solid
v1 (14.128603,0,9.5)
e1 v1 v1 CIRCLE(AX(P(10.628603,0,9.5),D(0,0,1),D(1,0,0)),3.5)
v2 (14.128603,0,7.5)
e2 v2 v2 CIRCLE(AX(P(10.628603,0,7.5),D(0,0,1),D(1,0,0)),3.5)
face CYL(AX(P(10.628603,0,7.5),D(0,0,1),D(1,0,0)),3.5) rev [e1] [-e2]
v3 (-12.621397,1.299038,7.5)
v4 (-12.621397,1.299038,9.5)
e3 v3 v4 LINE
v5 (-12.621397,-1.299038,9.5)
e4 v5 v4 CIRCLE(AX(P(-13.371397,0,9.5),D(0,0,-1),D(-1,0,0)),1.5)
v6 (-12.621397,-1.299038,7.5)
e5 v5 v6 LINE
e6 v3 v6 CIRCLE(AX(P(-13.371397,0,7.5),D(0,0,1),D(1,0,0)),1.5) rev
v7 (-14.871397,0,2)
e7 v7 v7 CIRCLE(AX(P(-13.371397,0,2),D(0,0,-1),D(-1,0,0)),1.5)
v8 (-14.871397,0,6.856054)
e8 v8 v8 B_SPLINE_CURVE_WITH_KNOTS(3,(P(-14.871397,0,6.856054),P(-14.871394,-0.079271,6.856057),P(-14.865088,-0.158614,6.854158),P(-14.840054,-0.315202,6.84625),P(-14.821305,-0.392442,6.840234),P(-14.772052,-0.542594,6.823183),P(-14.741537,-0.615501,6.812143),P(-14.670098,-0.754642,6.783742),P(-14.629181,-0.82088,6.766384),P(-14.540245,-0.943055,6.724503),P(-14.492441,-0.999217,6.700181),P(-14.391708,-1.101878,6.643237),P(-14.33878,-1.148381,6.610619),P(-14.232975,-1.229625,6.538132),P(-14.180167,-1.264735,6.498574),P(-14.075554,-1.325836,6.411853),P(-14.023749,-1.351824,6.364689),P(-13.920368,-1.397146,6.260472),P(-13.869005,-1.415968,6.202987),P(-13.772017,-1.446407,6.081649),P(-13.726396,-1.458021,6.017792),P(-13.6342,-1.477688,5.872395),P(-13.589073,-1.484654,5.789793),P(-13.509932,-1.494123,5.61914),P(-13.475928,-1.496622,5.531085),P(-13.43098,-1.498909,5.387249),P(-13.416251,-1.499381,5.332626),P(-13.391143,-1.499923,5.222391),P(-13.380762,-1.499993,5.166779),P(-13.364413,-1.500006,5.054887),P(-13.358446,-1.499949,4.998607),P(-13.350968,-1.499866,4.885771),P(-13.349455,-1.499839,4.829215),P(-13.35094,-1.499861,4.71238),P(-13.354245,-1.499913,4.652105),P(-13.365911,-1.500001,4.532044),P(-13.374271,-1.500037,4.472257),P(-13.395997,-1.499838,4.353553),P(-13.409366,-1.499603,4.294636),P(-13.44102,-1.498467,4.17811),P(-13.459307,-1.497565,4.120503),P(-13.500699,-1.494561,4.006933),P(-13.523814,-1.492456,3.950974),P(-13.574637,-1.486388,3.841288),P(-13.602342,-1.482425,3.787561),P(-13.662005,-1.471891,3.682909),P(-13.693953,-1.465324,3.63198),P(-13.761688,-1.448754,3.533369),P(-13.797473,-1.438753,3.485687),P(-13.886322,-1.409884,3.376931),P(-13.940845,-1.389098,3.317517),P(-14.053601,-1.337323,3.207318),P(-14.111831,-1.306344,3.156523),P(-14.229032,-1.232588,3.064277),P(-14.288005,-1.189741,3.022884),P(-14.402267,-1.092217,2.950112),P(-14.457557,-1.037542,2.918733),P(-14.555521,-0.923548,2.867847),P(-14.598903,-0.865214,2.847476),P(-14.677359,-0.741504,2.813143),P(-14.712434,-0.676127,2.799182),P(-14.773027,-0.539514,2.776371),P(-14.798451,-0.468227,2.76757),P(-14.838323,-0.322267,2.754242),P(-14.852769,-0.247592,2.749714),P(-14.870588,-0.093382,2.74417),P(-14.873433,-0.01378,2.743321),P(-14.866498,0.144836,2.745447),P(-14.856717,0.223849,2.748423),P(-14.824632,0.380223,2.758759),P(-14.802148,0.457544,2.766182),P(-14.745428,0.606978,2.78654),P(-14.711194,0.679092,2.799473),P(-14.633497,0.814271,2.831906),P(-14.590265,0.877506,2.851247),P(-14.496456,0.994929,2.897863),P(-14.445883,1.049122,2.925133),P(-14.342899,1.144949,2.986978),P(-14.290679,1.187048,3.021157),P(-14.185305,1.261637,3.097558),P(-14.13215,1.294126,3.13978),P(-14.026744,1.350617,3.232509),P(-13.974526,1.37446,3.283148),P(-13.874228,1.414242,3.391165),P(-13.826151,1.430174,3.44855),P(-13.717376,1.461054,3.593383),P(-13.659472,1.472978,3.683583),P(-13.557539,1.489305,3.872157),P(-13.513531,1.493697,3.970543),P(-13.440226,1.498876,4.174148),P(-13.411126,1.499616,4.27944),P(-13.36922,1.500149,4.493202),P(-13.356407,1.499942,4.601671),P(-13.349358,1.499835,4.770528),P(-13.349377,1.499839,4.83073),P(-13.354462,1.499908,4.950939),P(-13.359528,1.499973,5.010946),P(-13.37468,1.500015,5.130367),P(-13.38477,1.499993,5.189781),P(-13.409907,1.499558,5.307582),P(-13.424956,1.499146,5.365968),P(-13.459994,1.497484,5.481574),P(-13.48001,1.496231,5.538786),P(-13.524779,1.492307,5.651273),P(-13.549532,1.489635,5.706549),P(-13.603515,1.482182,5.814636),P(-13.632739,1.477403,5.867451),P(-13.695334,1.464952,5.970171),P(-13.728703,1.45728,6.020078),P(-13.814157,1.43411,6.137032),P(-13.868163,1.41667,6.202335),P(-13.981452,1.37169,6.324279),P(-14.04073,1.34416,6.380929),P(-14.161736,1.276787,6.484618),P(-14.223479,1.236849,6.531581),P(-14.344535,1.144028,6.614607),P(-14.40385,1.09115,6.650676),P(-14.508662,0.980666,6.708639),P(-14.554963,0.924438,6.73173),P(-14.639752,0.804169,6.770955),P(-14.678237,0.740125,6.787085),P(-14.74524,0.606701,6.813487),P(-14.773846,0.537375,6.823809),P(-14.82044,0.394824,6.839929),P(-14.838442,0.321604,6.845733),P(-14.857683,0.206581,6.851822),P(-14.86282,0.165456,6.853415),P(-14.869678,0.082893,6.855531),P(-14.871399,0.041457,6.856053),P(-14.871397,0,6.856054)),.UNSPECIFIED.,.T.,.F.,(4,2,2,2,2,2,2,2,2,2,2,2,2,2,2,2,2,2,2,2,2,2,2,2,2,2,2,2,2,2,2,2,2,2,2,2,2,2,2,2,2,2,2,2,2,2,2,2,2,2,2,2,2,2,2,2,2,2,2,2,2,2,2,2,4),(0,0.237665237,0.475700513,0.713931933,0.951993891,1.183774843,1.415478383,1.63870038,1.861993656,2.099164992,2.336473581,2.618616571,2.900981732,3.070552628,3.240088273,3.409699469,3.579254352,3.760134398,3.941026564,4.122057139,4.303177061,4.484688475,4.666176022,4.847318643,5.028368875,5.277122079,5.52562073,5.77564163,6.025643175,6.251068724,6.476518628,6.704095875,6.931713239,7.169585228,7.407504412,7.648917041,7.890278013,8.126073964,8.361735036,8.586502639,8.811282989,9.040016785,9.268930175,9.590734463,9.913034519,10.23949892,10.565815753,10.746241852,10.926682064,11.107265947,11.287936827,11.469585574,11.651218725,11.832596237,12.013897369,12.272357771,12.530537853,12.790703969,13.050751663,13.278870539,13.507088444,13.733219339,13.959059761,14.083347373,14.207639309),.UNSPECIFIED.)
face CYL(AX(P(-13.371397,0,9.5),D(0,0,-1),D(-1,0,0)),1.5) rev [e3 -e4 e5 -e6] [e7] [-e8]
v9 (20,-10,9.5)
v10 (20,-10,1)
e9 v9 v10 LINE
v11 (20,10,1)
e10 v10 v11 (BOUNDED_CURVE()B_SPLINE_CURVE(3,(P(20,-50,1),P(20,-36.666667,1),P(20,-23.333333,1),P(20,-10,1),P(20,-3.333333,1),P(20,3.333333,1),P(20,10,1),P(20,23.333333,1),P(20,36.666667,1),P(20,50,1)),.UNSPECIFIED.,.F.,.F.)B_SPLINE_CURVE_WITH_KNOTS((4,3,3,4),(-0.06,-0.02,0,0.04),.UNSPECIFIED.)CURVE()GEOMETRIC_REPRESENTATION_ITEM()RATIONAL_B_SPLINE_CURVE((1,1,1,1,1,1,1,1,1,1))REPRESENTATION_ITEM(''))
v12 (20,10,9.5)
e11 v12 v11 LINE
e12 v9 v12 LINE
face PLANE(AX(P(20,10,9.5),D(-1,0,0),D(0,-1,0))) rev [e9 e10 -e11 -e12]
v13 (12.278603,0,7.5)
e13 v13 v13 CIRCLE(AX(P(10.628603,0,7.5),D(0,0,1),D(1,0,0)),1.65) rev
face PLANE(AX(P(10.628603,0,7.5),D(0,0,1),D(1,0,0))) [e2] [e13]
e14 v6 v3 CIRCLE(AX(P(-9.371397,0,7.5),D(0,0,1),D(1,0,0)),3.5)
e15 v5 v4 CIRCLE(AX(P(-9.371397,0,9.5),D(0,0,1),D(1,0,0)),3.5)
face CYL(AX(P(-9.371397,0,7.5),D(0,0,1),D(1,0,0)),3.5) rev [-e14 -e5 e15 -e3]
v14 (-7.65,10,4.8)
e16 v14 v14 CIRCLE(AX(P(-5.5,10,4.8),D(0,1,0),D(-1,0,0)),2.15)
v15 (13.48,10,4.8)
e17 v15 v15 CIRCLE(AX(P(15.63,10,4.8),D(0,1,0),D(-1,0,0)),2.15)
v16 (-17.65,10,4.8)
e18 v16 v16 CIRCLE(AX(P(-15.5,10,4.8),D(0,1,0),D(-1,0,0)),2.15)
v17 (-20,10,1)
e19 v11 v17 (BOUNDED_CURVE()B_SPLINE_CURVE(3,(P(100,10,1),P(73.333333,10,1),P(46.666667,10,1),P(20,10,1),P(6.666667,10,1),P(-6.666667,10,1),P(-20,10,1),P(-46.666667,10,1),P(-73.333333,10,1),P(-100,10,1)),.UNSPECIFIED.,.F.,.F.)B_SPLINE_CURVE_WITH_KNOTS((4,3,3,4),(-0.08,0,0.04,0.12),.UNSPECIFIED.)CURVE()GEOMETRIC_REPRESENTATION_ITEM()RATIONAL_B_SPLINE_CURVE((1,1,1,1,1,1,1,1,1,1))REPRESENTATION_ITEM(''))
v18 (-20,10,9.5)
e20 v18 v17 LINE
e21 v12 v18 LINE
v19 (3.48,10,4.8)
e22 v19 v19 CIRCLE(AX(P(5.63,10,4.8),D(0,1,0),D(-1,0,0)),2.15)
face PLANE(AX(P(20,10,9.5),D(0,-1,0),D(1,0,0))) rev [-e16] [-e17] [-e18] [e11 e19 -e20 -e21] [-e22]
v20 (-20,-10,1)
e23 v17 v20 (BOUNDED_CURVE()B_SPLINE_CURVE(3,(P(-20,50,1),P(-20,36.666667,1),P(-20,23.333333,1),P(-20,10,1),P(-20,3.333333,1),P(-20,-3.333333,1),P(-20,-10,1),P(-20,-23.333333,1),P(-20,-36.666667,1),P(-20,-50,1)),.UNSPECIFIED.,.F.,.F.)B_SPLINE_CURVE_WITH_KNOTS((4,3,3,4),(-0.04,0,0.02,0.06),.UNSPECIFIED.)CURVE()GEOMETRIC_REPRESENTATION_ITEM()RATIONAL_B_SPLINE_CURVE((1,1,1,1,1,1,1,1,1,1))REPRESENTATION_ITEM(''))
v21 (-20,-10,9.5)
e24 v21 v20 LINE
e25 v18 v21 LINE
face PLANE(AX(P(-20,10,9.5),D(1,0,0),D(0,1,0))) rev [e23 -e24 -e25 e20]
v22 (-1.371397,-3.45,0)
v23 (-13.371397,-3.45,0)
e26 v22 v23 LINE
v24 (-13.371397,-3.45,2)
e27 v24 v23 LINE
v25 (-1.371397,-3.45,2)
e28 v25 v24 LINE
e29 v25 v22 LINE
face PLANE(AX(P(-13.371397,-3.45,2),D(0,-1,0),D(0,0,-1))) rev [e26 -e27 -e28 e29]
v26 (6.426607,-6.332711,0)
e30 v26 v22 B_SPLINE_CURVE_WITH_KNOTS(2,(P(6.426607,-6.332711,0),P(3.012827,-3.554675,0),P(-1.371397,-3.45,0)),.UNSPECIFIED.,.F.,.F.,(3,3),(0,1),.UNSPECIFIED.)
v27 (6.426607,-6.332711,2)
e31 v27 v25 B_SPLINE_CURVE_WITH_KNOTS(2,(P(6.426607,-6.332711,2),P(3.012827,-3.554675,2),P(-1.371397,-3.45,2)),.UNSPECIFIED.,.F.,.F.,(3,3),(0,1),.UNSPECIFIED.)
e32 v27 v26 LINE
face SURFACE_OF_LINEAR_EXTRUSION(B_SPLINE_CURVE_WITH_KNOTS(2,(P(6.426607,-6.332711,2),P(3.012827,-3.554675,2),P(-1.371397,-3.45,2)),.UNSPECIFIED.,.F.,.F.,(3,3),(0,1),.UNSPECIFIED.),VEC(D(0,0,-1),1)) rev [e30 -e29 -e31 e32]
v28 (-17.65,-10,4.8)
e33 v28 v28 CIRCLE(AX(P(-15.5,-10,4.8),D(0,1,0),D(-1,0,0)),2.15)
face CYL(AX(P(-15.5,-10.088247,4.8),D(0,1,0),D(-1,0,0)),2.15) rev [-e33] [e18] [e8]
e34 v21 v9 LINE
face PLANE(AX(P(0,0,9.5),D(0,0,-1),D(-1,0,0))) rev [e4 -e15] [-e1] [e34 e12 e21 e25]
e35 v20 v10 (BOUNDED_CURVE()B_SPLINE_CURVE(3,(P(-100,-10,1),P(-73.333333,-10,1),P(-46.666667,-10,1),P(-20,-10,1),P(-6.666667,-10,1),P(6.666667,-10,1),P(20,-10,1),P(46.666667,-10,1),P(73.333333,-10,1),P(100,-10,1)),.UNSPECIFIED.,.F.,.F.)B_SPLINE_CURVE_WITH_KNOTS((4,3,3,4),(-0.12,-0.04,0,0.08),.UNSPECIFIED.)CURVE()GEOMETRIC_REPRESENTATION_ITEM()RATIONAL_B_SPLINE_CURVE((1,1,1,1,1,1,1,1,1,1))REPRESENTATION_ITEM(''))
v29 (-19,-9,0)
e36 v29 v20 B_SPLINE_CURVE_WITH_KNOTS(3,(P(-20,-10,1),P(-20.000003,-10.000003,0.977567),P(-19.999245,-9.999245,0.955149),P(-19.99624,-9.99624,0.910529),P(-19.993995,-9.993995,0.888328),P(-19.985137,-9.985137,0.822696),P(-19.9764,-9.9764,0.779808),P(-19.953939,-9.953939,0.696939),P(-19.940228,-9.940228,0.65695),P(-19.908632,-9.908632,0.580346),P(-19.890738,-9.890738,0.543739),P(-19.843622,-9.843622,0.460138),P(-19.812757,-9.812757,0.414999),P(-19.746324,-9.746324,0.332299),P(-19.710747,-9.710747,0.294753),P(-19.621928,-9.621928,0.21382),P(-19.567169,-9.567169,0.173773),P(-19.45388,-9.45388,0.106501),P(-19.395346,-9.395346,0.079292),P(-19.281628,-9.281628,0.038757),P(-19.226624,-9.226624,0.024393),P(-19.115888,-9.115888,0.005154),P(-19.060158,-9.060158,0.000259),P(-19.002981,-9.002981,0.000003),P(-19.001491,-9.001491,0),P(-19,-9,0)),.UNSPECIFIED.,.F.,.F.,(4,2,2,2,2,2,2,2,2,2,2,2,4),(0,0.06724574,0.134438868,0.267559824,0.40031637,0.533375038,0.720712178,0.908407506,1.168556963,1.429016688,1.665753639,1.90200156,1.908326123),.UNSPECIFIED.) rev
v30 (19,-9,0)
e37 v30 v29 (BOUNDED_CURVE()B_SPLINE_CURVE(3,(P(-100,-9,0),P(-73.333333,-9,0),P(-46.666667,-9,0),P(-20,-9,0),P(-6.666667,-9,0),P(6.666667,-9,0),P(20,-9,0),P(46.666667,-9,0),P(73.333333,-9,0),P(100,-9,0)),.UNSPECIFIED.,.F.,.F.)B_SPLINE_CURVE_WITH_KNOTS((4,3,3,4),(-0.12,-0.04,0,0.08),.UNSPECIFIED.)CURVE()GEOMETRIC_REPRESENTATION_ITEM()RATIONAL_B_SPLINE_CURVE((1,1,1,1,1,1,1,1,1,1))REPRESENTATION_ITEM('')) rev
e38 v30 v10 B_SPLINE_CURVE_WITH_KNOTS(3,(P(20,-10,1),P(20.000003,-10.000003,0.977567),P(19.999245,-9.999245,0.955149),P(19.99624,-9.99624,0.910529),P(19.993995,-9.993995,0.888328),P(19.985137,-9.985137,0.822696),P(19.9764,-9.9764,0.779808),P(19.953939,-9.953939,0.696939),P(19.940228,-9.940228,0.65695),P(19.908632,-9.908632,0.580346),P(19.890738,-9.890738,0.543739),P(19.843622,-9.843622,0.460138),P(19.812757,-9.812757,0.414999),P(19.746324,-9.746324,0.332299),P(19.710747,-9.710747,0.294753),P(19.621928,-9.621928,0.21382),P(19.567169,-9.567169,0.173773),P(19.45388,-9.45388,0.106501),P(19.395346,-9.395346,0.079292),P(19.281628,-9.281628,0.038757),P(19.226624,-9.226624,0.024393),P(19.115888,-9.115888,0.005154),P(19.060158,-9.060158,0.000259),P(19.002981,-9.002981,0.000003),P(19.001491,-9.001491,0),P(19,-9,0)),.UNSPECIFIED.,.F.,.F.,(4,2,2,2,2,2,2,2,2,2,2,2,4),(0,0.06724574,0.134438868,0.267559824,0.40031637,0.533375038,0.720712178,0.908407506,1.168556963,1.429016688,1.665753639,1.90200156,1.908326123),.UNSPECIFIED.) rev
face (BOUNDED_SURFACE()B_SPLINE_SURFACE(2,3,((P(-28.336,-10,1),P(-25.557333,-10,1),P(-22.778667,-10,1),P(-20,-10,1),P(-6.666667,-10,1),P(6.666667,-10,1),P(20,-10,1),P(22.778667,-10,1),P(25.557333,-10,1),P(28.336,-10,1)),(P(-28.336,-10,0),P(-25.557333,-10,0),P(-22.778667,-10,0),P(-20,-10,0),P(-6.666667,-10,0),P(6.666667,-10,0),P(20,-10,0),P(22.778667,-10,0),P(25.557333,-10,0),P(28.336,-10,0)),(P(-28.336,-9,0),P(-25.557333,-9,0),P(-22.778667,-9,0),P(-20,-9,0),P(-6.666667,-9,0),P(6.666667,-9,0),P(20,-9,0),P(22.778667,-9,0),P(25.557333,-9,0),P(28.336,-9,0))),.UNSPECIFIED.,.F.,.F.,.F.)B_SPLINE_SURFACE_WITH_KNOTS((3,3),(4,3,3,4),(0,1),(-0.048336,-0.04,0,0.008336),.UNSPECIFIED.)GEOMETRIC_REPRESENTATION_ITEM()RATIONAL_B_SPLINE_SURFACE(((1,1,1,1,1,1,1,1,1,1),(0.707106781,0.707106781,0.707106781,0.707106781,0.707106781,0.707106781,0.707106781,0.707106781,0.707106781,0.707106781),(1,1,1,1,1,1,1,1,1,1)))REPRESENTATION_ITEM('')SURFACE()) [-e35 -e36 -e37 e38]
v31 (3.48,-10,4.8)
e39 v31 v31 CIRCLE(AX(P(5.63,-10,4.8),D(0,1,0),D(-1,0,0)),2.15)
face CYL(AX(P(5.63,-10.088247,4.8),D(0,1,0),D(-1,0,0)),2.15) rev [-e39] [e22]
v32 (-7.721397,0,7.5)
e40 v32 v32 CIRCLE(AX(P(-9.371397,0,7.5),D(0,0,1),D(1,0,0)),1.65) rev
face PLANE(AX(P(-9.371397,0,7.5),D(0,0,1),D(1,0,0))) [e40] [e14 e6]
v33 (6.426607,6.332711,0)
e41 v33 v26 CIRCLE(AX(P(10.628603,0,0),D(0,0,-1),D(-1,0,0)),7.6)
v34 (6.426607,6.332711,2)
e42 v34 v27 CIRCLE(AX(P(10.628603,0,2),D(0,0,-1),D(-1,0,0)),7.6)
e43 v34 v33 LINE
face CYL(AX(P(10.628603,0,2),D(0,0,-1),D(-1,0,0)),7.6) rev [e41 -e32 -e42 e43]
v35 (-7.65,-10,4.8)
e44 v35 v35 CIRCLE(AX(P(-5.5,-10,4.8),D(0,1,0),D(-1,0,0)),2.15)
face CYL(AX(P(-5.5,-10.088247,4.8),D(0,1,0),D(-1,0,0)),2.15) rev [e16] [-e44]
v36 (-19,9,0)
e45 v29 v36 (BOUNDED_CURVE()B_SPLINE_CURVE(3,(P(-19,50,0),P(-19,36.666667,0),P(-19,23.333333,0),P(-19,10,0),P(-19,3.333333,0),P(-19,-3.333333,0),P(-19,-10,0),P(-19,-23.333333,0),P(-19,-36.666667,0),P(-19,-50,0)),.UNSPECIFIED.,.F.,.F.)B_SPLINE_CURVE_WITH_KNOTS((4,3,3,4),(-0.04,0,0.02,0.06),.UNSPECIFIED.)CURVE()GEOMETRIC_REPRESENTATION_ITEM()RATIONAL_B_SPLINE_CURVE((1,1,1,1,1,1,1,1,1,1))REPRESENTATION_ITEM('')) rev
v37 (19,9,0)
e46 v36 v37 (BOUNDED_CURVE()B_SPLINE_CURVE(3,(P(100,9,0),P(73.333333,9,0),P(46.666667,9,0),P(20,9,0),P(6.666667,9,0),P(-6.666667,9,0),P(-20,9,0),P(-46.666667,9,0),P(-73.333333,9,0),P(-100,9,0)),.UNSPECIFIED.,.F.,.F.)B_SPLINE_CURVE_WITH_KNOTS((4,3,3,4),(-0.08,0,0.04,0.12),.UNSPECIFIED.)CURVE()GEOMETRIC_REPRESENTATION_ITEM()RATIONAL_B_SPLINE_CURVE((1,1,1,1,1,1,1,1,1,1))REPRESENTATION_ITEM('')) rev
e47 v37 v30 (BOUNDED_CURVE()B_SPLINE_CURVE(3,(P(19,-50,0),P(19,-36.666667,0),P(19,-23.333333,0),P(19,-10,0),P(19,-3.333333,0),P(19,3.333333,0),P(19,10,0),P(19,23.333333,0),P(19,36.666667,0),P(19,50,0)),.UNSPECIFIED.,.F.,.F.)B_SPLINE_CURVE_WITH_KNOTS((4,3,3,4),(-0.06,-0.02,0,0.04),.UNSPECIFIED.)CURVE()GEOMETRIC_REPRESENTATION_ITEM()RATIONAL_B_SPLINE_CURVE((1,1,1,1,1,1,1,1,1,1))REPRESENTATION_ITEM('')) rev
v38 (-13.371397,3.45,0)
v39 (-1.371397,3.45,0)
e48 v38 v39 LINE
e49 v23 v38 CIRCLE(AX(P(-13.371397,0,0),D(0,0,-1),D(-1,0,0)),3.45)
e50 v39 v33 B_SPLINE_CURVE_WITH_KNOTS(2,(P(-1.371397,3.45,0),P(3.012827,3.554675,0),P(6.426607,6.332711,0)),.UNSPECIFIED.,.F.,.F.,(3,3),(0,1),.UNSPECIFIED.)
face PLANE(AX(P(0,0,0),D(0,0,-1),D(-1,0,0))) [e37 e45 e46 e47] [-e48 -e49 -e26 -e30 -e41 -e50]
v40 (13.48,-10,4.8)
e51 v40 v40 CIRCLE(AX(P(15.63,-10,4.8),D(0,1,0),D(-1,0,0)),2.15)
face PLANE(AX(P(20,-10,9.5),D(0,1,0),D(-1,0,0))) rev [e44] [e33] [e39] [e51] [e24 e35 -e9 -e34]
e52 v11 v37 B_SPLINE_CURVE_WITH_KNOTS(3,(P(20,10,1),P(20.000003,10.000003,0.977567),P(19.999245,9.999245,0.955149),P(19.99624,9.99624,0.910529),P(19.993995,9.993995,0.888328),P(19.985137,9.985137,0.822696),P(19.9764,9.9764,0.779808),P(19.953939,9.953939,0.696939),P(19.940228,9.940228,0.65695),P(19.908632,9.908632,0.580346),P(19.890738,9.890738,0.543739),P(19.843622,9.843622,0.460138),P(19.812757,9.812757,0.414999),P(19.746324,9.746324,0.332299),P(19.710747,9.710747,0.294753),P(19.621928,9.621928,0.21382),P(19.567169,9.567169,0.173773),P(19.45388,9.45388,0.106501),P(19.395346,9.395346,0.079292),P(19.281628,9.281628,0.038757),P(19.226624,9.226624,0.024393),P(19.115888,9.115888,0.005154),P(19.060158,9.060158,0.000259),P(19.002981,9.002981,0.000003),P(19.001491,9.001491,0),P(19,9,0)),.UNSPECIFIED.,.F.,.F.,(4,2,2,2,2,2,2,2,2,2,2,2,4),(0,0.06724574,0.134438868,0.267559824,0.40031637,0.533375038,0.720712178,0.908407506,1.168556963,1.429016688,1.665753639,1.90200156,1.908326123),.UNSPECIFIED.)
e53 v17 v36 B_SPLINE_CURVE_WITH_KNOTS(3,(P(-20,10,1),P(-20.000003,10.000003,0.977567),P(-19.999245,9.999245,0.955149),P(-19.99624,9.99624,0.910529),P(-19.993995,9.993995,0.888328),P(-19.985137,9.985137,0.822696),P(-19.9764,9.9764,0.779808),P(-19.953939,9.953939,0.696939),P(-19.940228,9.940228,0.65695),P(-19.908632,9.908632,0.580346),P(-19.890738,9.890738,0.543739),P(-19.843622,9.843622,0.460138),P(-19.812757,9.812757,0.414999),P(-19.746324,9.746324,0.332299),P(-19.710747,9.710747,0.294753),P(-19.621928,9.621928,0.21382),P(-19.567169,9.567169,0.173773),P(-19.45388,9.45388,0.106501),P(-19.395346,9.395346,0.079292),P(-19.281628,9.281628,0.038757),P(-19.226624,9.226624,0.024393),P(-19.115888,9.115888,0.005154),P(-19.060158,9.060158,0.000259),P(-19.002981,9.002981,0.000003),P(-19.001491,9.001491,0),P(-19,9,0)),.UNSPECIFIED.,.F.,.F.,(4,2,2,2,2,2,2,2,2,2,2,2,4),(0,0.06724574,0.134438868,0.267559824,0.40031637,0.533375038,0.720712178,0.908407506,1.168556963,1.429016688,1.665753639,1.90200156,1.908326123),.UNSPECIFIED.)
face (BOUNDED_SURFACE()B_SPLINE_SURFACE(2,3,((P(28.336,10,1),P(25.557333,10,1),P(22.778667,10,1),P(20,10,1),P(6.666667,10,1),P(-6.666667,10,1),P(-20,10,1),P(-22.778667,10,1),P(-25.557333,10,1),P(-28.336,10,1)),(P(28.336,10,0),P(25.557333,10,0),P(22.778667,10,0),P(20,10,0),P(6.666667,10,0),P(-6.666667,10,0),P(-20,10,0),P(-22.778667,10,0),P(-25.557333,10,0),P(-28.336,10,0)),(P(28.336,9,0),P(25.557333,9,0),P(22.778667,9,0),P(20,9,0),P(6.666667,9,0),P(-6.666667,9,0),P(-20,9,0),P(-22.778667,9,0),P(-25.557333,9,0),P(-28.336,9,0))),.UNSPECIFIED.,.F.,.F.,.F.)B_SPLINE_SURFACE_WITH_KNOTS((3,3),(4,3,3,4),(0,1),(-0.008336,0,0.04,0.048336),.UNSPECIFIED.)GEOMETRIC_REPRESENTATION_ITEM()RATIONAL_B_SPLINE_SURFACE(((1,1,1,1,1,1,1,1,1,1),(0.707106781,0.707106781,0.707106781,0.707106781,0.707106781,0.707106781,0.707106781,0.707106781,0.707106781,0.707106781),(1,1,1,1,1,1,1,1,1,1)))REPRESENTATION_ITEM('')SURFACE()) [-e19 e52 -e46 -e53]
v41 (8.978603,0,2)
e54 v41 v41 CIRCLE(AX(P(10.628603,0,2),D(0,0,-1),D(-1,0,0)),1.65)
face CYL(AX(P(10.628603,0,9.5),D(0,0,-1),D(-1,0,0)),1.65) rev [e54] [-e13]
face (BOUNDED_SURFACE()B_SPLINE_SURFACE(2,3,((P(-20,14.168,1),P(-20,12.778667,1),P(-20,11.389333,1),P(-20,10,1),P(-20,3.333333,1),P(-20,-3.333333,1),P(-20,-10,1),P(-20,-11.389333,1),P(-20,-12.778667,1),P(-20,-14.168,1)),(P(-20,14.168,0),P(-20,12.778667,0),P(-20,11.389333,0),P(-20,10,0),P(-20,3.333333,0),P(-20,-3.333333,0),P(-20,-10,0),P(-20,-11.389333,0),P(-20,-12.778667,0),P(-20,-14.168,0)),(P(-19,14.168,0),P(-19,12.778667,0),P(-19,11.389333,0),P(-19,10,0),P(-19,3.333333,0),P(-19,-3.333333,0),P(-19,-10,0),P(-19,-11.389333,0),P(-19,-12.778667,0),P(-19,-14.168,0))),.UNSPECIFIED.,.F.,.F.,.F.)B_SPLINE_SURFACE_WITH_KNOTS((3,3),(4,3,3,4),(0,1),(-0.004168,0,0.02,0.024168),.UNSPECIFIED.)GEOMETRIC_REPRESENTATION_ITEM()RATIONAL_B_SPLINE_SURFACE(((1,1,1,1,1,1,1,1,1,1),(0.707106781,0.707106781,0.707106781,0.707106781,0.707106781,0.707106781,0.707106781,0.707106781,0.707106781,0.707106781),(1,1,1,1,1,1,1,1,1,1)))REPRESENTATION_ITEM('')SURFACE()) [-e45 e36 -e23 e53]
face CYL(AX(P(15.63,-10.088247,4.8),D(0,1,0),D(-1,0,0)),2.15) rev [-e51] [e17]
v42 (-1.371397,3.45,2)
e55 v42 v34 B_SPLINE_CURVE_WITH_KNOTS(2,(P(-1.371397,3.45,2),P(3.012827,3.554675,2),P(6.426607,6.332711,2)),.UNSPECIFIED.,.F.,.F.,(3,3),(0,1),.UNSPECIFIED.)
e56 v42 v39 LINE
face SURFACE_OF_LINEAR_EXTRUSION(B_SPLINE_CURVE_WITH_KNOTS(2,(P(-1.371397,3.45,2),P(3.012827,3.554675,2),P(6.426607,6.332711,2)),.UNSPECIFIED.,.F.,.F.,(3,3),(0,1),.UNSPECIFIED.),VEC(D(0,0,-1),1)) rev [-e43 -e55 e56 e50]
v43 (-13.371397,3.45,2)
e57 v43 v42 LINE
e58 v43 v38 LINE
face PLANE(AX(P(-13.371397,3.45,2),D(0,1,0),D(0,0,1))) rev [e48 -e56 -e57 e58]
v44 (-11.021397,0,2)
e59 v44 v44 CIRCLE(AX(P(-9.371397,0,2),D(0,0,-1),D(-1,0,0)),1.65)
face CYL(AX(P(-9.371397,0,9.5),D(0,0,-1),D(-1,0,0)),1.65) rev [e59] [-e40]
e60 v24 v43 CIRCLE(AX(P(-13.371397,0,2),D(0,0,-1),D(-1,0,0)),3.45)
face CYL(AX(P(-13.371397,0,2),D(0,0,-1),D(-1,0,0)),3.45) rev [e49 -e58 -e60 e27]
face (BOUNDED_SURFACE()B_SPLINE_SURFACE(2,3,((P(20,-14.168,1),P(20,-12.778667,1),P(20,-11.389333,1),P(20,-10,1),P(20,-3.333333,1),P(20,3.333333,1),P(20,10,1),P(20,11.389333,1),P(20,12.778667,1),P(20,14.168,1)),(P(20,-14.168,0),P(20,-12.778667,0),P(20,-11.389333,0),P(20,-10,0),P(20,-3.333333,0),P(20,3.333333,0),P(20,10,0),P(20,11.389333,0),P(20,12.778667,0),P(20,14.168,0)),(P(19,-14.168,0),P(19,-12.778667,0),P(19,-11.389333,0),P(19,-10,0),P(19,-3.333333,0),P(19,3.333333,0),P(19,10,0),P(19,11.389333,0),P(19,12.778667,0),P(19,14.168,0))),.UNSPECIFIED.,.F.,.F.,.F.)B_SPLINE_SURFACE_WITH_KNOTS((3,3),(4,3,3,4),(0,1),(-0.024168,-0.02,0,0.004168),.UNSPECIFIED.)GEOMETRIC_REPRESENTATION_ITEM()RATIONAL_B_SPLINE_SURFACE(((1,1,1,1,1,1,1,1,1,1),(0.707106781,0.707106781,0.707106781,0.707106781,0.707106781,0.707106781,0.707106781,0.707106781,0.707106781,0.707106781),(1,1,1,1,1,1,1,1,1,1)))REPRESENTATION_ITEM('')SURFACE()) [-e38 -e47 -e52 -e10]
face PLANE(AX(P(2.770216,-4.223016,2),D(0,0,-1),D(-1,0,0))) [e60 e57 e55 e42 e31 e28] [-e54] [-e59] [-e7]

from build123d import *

# Parameters (mm, degrees)
SKETCH1_W           = 40
SKETCH1_H           = 20
BOSS_EXTRUDE1_DEPTH = 9.5
CUT_EXTRUDE1_DEPTH  = 2
FILLET1_R           = 1
SKETCH4_R           = 2.15
CUT_EXTRUDE2_DEPTH  = 30.837057496
SKETCH5_R           = 1.5
SKETCH5_R_2         = 1.65
CUT_EXTRUDE3_DEPTH  = 25.295061227
SKETCH6_R           = 3.5
CUT_EXTRUDE4_DEPTH  = 2


with BuildPart() as part:
    # Sketch1 → Boss-Extrude1 (new body)
    with BuildSketch(Plane.XY):
        Rectangle(SKETCH1_W, SKETCH1_H)
    extrude(amount=BOSS_EXTRUDE1_DEPTH)

    # Sketch3 → Cut-Extrude1 (cut)
    with BuildSketch(Plane(origin=(0, 0, 0), x_dir=(-1, 0, 0), z_dir=(0, 0, -1))):
        with BuildLine():
            Line((13.371397425, -3.45), (1.371397425, -3.45))
            add(Edge.make_bspline(
                [(-6.426606991, -6.332711355), (-3.012827406, -3.55467535), (1.371397425, -3.45)],
                knots=[0, 0, 0, 1, 1, 1], degree=2))
            ThreePointArc((-6.426606991, -6.332711355), (-18.228602575, 0), (-6.426606991, 6.332711355))
            add(Edge.make_bspline(
                [(-6.426606991, 6.332711355), (-3.012827406, 3.55467535), (1.371397425, 3.45)],
                knots=[0, 0, 0, 1, 1, 1], degree=2))
            Line((1.371397425, 3.45), (13.371397425, 3.45))
            ThreePointArc((13.371397425, 3.45), (16.821397425, 0), (13.371397425, -3.45))
        make_face()
    extrude(amount=-CUT_EXTRUDE1_DEPTH, mode=Mode.SUBTRACT)

    # Fillet1
    fillet1_edges = [part.edges().sort_by_distance(p)[0] for p in [
        (-20, 0, 0),
        (0, -10, 0),
        (0, 10, 0),
        (20, 0, 0),
    ]]
    fillet(fillet1_edges, radius=FILLET1_R)

    # Sketch4 → Cut-Extrude2 (cut, through all)
    with BuildSketch(Plane(origin=(0, 10, 0), x_dir=(1, 0, 0), z_dir=(0, 1, 0))):
        with Locations((-15.5, -4.8)):
            Circle(SKETCH4_R)
        with Locations((-5.5, -4.8)):
            Circle(SKETCH4_R)
        with Locations((5.63, -4.8)):
            Circle(SKETCH4_R)
        with Locations((15.63, -4.8)):
            Circle(SKETCH4_R)
    extrude(amount=-CUT_EXTRUDE2_DEPTH, mode=Mode.SUBTRACT)

    # Sketch5 → Cut-Extrude3 (cut, through all)
    with BuildSketch(Plane(origin=(0, 0, 0), x_dir=(-1, 0, 0), z_dir=(0, 0, -1))):
        with Locations((13.371397425, 0)):
            Circle(SKETCH5_R)
        with Locations((9.371397425, 0)):
            Circle(SKETCH5_R_2)
        with Locations((-10.628602575, 0)):
            Circle(SKETCH5_R_2)
    extrude(amount=-CUT_EXTRUDE3_DEPTH, mode=Mode.SUBTRACT)

    # Sketch6 → Cut-Extrude4 (cut)
    with BuildSketch(Plane.XY.offset(9.5)):
        with Locations((10.628602575, 0)):
            Circle(SKETCH6_R)
        with Locations((-9.371397425, 0)):
            Circle(SKETCH6_R)
    extrude(amount=-CUT_EXTRUDE4_DEPTH, mode=Mode.SUBTRACT)


solid = part.part
